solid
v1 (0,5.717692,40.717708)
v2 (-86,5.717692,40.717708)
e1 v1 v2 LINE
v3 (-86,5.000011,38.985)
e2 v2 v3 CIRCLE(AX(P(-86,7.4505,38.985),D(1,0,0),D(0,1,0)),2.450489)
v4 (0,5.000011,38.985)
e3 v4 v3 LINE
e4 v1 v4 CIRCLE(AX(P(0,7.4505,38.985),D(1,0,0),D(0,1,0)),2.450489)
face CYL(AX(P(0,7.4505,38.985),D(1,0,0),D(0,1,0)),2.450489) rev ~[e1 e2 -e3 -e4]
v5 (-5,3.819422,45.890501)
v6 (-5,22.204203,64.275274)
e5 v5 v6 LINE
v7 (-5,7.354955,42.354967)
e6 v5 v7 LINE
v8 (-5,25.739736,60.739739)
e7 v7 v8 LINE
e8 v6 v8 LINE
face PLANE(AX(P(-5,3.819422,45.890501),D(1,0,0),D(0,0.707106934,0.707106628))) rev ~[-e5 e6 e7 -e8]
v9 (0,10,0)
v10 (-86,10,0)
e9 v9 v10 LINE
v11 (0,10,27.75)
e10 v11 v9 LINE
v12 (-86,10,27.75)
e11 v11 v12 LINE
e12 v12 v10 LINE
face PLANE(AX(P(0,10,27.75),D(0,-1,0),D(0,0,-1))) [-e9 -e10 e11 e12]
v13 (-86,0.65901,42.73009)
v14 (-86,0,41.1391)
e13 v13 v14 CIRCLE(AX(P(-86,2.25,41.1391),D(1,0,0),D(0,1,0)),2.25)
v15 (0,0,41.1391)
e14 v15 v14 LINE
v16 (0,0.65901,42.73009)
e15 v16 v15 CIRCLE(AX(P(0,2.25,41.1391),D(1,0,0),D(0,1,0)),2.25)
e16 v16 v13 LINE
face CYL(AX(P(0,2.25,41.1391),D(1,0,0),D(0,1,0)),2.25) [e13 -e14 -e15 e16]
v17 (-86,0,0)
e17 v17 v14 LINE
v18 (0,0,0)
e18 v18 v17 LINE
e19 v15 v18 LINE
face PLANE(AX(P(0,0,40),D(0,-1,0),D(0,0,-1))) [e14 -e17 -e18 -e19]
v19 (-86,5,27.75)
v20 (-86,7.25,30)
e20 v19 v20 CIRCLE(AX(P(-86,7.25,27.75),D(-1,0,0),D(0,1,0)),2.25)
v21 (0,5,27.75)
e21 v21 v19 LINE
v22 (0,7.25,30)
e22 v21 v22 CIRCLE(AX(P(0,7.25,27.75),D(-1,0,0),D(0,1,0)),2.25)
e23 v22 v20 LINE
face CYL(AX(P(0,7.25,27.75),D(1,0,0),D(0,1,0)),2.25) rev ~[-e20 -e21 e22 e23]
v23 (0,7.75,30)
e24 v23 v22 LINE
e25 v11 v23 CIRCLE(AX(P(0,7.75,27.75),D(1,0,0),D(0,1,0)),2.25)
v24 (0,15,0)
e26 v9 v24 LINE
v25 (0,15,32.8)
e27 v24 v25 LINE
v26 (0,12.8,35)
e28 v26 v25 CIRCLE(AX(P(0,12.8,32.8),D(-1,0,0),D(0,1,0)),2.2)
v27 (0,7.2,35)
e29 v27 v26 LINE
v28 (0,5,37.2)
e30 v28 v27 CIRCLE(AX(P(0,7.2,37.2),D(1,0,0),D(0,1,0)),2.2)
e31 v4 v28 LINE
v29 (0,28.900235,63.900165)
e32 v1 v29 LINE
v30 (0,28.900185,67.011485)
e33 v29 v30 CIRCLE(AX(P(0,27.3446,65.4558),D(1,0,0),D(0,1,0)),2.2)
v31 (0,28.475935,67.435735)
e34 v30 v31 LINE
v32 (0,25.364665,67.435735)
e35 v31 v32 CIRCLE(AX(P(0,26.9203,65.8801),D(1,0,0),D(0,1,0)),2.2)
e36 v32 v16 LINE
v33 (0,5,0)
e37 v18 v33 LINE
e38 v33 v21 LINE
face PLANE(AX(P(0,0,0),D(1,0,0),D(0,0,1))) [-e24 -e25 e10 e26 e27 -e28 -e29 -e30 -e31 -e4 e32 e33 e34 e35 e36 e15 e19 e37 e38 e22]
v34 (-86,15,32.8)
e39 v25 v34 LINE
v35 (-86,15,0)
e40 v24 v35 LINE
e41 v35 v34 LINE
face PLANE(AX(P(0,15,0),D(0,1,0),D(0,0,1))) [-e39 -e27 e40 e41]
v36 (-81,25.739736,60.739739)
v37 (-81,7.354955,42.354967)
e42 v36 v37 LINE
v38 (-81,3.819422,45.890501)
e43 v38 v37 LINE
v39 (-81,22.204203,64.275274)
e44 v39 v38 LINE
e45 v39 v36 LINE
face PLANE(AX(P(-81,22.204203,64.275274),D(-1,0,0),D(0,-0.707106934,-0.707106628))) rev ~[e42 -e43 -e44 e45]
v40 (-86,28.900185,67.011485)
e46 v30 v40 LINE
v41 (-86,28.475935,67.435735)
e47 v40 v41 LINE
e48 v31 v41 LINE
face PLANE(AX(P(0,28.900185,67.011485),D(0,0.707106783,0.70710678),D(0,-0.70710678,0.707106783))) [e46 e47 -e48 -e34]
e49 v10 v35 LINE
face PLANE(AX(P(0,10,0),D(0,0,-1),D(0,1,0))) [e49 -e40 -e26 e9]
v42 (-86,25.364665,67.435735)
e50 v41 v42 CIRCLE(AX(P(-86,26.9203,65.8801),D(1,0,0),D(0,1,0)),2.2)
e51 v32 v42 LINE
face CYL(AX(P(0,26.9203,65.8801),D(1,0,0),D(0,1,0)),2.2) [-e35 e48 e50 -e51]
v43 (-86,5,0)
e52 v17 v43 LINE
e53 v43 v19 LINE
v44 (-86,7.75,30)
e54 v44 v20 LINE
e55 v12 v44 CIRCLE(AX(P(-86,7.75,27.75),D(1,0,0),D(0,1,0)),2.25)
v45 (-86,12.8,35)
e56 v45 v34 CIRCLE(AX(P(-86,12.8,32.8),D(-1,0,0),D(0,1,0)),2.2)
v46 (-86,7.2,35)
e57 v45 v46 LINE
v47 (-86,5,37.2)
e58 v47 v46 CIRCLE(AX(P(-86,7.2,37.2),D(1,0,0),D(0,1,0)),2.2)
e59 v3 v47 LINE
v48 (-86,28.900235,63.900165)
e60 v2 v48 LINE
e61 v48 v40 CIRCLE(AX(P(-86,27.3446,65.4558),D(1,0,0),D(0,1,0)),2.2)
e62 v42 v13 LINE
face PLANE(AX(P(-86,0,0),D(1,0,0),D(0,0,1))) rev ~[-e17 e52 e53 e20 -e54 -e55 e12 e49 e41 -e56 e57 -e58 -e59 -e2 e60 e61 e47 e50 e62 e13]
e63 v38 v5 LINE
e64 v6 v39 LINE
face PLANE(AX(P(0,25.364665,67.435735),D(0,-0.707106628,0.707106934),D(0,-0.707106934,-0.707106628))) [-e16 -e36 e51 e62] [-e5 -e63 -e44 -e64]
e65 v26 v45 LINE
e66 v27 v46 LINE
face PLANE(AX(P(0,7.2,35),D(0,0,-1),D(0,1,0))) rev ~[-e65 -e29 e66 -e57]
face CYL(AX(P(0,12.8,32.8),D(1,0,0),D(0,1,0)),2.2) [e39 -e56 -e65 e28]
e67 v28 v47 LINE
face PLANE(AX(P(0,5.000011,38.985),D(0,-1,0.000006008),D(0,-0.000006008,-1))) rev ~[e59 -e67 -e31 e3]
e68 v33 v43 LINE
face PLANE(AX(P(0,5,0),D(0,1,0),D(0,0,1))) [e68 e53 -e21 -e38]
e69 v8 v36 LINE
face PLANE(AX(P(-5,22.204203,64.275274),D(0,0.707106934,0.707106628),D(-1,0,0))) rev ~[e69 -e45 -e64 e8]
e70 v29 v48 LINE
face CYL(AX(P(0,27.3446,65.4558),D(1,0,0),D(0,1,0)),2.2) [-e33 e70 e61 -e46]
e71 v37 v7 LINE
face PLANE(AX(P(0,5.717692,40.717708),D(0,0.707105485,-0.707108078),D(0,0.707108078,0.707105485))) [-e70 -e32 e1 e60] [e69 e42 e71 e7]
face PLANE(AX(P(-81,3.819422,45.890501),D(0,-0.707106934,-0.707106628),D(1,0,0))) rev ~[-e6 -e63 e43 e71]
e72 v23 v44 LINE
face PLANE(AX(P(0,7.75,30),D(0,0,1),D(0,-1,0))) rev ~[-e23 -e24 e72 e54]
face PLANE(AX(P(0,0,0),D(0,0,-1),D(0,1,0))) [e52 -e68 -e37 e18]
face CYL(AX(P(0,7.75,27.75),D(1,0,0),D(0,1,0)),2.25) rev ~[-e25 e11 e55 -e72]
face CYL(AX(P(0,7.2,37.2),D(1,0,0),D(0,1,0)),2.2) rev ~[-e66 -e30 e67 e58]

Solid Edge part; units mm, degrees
sketch "Sketch1" plane through (0, 0, 0) normal (1, 0, 0) x (0, 1, 0)
  arc A0 (28.4759, 67.4357) -> (25.3647, 67.4357) centre (26.9203, 65.8801) ccw
  line L0 (25.3647, 67.4357) -> (0.659, 42.7301)
  arc A1 (0.659, 42.7301) -> (0, 41.1391) centre (2.25, 41.1391) ccw
  line L1 (0, 41.1391) -> (0, 40)
  line L2 (0, 40) -> (0, 0)
  line L3 (0, 0) -> (5, 0)
  line L4 (5, 0) -> (5, 27.75)
  arc A2 (5, 27.75) -> (7.25, 30) centre (7.25, 27.75) cw
  line L5 (7.75, 30) -> (7.25, 30)
  arc A3 (10, 27.75) -> (7.75, 30) centre (7.75, 27.75) ccw
  line L6 (10, 27.75) -> (10, 0)
  line L7 (10, 0) -> (15, 0)
  line L8 (15, 0) -> (15, 32.8)
  arc A4 (12.8, 35) -> (15, 32.8) centre (12.8, 32.8) cw
  line L9 (7.2, 35) -> (12.8, 35)
  line L10 (7.2, 35) -> (10, 35)
  arc A5 (5, 37.2) -> (7.2, 35) centre (7.2, 37.2) ccw
  line L11 (5, 38.985) -> (5, 37.2)
  arc A6 (5.7177, 40.7177) -> (5, 38.985) centre (7.4505, 38.985) ccw
  line L12 (5.7177, 40.7177) -> (28.9002, 63.9002)
  arc A7 (28.9002, 63.9002) -> (28.9002, 67.0115) centre (27.3446, 65.4558) ccw
  line L13 (28.9002, 67.0115) -> (28.4759, 67.4357)
extrude "Protrusion1" add sketch "Sketch1" against normal blind 86 material side at (0, 26.9203, 68.1301)
sketch "Sketch2" plane through (-43, 13.0118, 55.0829) normal (0, -0.7071068, 0.7071068) x (1, 0, 0)
  line L0 (38, -13) -> (38, 13)
  line L1 (38, 13) -> (-38, 13)
  line L2 (-38, 13) -> (-38, -13)
  line L3 (-38, -13) -> (38, -13)
extrude "Cutout1" cut sketch "Sketch2" against normal blind 5
